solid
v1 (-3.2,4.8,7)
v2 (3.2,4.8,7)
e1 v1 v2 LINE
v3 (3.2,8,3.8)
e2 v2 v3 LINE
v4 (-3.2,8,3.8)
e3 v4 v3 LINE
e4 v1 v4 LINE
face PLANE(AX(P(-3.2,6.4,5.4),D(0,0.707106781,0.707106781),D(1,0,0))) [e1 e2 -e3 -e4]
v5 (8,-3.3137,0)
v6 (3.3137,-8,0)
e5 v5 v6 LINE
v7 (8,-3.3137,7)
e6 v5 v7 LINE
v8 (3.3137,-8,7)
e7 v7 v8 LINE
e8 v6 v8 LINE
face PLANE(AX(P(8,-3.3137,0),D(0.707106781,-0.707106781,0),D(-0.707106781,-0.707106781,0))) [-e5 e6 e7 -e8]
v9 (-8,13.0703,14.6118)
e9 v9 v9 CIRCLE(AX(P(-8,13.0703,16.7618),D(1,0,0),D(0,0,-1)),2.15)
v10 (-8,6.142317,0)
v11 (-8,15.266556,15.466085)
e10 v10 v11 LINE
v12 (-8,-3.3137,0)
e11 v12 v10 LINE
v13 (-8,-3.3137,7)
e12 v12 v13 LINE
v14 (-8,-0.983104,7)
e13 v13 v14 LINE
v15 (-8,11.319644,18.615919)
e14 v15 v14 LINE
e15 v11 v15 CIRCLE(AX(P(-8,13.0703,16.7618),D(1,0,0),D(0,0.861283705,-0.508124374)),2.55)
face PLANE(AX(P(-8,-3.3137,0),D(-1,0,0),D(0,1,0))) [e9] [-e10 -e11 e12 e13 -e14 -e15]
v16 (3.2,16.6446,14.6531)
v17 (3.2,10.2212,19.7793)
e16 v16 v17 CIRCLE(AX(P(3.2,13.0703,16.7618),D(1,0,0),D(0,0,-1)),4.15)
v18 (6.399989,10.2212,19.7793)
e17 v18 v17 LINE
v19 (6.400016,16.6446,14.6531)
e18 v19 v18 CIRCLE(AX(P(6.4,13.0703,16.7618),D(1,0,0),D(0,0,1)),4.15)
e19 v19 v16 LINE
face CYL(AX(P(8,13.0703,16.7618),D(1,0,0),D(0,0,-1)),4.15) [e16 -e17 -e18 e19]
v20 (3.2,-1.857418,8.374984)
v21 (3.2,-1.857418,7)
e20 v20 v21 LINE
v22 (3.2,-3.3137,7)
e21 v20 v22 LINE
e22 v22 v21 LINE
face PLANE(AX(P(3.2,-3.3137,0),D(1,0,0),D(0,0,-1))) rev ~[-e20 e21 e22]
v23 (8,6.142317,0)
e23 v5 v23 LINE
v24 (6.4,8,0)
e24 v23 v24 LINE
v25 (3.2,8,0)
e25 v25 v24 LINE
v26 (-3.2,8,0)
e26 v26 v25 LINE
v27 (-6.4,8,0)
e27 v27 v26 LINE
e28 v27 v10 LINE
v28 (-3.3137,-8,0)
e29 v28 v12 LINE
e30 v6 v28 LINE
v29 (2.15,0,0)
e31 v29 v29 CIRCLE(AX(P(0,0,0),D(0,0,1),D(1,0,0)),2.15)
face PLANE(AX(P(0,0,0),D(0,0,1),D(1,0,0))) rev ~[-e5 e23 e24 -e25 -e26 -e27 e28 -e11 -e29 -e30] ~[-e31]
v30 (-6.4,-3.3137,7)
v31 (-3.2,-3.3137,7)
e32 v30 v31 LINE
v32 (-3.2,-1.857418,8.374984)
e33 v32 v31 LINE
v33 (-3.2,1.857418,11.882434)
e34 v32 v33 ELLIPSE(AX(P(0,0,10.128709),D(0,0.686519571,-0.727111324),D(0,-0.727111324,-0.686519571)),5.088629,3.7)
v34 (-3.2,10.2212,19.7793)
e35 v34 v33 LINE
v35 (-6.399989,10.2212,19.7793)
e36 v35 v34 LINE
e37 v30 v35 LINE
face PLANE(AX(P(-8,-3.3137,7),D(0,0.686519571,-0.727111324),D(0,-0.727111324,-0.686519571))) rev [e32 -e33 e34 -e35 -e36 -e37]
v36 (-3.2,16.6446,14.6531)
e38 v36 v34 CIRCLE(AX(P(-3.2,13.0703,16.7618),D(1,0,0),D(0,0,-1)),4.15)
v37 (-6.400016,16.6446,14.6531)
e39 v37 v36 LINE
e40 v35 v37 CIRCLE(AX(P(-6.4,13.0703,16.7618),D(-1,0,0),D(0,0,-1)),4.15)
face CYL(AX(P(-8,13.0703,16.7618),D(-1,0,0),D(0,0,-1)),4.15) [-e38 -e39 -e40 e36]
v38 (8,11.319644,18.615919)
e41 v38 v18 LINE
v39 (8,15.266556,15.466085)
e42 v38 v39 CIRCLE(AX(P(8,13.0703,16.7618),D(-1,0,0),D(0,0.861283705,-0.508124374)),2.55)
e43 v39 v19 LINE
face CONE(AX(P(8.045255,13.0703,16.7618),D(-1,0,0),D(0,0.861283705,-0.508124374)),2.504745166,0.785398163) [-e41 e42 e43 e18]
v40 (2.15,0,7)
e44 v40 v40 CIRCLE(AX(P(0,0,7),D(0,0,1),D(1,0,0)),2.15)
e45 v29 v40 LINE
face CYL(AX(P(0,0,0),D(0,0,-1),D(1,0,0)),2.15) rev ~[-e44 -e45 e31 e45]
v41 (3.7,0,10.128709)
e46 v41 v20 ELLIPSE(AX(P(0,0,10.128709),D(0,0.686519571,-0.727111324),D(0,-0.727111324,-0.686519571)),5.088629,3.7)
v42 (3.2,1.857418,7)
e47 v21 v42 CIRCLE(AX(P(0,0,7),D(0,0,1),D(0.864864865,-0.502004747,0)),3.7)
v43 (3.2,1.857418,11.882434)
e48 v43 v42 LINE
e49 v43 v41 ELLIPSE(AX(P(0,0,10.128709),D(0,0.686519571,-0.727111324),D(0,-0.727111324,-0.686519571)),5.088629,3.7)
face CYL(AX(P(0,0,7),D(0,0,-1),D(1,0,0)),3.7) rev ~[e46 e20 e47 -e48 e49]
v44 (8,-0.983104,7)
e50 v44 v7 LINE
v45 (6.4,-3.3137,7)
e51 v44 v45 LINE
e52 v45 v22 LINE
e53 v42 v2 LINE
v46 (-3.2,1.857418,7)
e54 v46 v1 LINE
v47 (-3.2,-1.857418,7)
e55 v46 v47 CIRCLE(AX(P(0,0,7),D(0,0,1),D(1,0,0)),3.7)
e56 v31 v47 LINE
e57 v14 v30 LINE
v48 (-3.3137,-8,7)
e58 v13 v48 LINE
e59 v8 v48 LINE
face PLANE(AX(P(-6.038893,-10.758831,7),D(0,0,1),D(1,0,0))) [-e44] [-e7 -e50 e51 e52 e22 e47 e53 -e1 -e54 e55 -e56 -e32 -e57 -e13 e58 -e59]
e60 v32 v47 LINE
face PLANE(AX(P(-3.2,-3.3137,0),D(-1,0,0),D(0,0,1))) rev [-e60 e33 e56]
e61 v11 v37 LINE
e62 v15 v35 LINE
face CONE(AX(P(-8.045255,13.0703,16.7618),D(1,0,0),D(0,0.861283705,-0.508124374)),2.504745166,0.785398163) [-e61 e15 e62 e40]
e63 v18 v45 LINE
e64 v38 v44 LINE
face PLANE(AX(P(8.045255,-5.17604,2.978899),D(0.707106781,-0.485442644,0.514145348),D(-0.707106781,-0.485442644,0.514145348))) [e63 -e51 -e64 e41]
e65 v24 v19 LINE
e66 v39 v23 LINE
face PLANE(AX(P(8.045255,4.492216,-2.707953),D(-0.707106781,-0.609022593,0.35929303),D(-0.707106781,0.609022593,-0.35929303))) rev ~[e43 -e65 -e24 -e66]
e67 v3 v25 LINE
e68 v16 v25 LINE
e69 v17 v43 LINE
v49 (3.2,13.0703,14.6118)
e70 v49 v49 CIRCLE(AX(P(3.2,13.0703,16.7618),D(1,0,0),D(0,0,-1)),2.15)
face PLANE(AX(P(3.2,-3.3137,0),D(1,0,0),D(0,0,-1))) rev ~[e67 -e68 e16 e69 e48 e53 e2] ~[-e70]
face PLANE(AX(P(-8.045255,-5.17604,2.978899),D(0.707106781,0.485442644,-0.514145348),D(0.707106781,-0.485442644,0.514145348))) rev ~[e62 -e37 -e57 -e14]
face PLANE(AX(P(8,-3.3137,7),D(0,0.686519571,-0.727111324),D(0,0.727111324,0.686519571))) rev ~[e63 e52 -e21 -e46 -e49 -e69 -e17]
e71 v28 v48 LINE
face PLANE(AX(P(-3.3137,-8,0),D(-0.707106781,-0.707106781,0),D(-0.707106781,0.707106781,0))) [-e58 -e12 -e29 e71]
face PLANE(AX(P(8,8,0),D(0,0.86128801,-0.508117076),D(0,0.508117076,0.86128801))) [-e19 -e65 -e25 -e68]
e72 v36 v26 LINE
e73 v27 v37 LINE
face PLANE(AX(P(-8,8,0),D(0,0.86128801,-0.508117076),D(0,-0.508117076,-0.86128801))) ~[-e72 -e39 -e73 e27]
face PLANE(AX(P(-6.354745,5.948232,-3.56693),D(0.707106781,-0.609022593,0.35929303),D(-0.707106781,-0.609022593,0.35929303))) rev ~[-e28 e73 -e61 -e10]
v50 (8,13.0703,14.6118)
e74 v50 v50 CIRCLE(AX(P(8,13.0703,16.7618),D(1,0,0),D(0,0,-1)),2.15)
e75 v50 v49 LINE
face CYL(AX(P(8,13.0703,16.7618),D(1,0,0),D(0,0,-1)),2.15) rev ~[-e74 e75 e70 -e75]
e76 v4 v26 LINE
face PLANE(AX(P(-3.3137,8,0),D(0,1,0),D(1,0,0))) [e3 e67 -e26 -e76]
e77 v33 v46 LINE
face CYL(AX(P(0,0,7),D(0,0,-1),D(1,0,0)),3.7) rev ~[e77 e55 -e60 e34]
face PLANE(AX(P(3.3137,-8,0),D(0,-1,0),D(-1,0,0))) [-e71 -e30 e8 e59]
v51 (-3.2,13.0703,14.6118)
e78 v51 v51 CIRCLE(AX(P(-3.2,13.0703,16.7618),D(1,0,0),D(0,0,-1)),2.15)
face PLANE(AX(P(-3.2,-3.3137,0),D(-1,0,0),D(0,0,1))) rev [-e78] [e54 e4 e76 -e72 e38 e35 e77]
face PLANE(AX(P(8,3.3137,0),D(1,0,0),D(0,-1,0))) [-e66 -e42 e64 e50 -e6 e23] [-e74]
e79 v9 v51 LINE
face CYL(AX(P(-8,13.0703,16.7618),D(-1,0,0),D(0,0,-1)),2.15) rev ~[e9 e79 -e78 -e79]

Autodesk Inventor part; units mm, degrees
ref_plane "YZ Plane" through (0, 0, 0) normal (1, 0, 0) x (0, 1, 0)
ref_plane "XZ Plane" through (0, 0, 0) normal (0, 1, 0) x (-1, 0, 0)
ref_plane "XY Plane" through (0, 0, 0) normal (0, 0, 1) x (1, 0, 0)
sketch "Sketch1" plane through (0, 0, 0) normal (0, 0, 1) x (1, 0, 0)
  circle A0 centre (0, 0) radius 2.15
  line L0 (3.3137, 8) -> (8, 3.3137)
  line L1 (8, 3.3137) -> (8, -3.3137)
  line L2 (8, -3.3137) -> (3.3137, -8)
  line L3 (3.3137, -8) -> (-3.3137, -8)
  line L4 (-3.3137, -8) -> (-8, -3.3137)
  line L5 (-8, -3.3137) -> (-8, 3.3137)
  line L6 (-8, 3.3137) -> (-3.3137, 8)
  line L7 (-3.3137, 8) -> (3.3137, 8)
  dimension "d0" = 4.3
  dimension "d1" = 16
extrude "Extrusion1" add sketch "Sketch1" along normal blind 7
sketch "Sketch2" plane through (8, -3.3137, 0) normal (1, 0, 0) x (0, 0, -1)
  line L0 (0, 0) -> (-7, 0) projected
  line L1 (0, 6.6274) -> (0, 0) projected
  line L2 (0, 11.3137) -> (0, 6.6274) projected
  circle A0 centre (-16.7618, 16.384) radius 2.15
  circle A1 centre (-16.7618, 16.384) radius 4.15
  line L3 (0, 11.3137) -> (-7, 11.3137) projected
  line L4 (0, 11.3137) -> (-14.6531, 19.9583)
  line L5 (-7, 0) -> (-7, -4.6863) projected
  line L6 (-7, 0) -> (-19.7793, 13.5349)
  line L7 (-7, 1.1637) -> (-7, 5.4637) projected
  line L8 (-7, 3.3137) -> (-11, 3.3137)
  line L9 (-11, 3.3137) -> (-11, 7.0137)
  circle A2 centre (-16.7618, 16.384) radius 11
  point P0 (0, 3.3137)
  dimension "d4" = 4.3
  dimension "d6" = 2
  dimension "d17" = 4
  dimension "d18" = 3.7
  dimension "d19" = 22
extrude "Extrusion2" add sketch "Sketch2" against normal blind 4.8 contours L0 L6 L9 A2 L3 L2 L1 | L3 A2 L4 | L6 A2 L9 | A2 L6 A1 L4 | A1 picked at (-9.3805, 11.8131)
mirror "Mirror1" about plane through (0, 0, 0) normal (1, 0, 0) of "Extrusion2"
sketch "Sketch4" plane through (0, 0, 7) normal (0, 0, 1) x (1, 0, 0)
  circle A0 centre (0, 0) radius 3.7
  dimension "d14" = 7.4
extrude "Extrusion4" cut sketch "Sketch4" along normal through all
chamfer "Chamfer2" distance 1.6 angle 45 6 edges at (8, 15.6589, 20.0055) (8, 3.4538, 13.3896) (8, 12.3223, 7.3265) (-8, 3.4538, 13.3896) (-8, 15.6589, 20.0055) (-8, 12.3223, 7.3265)
chamfer "Chamfer3" distance 3.2 angle 45 1 edges at (0, 8, 7)
properties part number "kladka-midwheel-atTprofile"
